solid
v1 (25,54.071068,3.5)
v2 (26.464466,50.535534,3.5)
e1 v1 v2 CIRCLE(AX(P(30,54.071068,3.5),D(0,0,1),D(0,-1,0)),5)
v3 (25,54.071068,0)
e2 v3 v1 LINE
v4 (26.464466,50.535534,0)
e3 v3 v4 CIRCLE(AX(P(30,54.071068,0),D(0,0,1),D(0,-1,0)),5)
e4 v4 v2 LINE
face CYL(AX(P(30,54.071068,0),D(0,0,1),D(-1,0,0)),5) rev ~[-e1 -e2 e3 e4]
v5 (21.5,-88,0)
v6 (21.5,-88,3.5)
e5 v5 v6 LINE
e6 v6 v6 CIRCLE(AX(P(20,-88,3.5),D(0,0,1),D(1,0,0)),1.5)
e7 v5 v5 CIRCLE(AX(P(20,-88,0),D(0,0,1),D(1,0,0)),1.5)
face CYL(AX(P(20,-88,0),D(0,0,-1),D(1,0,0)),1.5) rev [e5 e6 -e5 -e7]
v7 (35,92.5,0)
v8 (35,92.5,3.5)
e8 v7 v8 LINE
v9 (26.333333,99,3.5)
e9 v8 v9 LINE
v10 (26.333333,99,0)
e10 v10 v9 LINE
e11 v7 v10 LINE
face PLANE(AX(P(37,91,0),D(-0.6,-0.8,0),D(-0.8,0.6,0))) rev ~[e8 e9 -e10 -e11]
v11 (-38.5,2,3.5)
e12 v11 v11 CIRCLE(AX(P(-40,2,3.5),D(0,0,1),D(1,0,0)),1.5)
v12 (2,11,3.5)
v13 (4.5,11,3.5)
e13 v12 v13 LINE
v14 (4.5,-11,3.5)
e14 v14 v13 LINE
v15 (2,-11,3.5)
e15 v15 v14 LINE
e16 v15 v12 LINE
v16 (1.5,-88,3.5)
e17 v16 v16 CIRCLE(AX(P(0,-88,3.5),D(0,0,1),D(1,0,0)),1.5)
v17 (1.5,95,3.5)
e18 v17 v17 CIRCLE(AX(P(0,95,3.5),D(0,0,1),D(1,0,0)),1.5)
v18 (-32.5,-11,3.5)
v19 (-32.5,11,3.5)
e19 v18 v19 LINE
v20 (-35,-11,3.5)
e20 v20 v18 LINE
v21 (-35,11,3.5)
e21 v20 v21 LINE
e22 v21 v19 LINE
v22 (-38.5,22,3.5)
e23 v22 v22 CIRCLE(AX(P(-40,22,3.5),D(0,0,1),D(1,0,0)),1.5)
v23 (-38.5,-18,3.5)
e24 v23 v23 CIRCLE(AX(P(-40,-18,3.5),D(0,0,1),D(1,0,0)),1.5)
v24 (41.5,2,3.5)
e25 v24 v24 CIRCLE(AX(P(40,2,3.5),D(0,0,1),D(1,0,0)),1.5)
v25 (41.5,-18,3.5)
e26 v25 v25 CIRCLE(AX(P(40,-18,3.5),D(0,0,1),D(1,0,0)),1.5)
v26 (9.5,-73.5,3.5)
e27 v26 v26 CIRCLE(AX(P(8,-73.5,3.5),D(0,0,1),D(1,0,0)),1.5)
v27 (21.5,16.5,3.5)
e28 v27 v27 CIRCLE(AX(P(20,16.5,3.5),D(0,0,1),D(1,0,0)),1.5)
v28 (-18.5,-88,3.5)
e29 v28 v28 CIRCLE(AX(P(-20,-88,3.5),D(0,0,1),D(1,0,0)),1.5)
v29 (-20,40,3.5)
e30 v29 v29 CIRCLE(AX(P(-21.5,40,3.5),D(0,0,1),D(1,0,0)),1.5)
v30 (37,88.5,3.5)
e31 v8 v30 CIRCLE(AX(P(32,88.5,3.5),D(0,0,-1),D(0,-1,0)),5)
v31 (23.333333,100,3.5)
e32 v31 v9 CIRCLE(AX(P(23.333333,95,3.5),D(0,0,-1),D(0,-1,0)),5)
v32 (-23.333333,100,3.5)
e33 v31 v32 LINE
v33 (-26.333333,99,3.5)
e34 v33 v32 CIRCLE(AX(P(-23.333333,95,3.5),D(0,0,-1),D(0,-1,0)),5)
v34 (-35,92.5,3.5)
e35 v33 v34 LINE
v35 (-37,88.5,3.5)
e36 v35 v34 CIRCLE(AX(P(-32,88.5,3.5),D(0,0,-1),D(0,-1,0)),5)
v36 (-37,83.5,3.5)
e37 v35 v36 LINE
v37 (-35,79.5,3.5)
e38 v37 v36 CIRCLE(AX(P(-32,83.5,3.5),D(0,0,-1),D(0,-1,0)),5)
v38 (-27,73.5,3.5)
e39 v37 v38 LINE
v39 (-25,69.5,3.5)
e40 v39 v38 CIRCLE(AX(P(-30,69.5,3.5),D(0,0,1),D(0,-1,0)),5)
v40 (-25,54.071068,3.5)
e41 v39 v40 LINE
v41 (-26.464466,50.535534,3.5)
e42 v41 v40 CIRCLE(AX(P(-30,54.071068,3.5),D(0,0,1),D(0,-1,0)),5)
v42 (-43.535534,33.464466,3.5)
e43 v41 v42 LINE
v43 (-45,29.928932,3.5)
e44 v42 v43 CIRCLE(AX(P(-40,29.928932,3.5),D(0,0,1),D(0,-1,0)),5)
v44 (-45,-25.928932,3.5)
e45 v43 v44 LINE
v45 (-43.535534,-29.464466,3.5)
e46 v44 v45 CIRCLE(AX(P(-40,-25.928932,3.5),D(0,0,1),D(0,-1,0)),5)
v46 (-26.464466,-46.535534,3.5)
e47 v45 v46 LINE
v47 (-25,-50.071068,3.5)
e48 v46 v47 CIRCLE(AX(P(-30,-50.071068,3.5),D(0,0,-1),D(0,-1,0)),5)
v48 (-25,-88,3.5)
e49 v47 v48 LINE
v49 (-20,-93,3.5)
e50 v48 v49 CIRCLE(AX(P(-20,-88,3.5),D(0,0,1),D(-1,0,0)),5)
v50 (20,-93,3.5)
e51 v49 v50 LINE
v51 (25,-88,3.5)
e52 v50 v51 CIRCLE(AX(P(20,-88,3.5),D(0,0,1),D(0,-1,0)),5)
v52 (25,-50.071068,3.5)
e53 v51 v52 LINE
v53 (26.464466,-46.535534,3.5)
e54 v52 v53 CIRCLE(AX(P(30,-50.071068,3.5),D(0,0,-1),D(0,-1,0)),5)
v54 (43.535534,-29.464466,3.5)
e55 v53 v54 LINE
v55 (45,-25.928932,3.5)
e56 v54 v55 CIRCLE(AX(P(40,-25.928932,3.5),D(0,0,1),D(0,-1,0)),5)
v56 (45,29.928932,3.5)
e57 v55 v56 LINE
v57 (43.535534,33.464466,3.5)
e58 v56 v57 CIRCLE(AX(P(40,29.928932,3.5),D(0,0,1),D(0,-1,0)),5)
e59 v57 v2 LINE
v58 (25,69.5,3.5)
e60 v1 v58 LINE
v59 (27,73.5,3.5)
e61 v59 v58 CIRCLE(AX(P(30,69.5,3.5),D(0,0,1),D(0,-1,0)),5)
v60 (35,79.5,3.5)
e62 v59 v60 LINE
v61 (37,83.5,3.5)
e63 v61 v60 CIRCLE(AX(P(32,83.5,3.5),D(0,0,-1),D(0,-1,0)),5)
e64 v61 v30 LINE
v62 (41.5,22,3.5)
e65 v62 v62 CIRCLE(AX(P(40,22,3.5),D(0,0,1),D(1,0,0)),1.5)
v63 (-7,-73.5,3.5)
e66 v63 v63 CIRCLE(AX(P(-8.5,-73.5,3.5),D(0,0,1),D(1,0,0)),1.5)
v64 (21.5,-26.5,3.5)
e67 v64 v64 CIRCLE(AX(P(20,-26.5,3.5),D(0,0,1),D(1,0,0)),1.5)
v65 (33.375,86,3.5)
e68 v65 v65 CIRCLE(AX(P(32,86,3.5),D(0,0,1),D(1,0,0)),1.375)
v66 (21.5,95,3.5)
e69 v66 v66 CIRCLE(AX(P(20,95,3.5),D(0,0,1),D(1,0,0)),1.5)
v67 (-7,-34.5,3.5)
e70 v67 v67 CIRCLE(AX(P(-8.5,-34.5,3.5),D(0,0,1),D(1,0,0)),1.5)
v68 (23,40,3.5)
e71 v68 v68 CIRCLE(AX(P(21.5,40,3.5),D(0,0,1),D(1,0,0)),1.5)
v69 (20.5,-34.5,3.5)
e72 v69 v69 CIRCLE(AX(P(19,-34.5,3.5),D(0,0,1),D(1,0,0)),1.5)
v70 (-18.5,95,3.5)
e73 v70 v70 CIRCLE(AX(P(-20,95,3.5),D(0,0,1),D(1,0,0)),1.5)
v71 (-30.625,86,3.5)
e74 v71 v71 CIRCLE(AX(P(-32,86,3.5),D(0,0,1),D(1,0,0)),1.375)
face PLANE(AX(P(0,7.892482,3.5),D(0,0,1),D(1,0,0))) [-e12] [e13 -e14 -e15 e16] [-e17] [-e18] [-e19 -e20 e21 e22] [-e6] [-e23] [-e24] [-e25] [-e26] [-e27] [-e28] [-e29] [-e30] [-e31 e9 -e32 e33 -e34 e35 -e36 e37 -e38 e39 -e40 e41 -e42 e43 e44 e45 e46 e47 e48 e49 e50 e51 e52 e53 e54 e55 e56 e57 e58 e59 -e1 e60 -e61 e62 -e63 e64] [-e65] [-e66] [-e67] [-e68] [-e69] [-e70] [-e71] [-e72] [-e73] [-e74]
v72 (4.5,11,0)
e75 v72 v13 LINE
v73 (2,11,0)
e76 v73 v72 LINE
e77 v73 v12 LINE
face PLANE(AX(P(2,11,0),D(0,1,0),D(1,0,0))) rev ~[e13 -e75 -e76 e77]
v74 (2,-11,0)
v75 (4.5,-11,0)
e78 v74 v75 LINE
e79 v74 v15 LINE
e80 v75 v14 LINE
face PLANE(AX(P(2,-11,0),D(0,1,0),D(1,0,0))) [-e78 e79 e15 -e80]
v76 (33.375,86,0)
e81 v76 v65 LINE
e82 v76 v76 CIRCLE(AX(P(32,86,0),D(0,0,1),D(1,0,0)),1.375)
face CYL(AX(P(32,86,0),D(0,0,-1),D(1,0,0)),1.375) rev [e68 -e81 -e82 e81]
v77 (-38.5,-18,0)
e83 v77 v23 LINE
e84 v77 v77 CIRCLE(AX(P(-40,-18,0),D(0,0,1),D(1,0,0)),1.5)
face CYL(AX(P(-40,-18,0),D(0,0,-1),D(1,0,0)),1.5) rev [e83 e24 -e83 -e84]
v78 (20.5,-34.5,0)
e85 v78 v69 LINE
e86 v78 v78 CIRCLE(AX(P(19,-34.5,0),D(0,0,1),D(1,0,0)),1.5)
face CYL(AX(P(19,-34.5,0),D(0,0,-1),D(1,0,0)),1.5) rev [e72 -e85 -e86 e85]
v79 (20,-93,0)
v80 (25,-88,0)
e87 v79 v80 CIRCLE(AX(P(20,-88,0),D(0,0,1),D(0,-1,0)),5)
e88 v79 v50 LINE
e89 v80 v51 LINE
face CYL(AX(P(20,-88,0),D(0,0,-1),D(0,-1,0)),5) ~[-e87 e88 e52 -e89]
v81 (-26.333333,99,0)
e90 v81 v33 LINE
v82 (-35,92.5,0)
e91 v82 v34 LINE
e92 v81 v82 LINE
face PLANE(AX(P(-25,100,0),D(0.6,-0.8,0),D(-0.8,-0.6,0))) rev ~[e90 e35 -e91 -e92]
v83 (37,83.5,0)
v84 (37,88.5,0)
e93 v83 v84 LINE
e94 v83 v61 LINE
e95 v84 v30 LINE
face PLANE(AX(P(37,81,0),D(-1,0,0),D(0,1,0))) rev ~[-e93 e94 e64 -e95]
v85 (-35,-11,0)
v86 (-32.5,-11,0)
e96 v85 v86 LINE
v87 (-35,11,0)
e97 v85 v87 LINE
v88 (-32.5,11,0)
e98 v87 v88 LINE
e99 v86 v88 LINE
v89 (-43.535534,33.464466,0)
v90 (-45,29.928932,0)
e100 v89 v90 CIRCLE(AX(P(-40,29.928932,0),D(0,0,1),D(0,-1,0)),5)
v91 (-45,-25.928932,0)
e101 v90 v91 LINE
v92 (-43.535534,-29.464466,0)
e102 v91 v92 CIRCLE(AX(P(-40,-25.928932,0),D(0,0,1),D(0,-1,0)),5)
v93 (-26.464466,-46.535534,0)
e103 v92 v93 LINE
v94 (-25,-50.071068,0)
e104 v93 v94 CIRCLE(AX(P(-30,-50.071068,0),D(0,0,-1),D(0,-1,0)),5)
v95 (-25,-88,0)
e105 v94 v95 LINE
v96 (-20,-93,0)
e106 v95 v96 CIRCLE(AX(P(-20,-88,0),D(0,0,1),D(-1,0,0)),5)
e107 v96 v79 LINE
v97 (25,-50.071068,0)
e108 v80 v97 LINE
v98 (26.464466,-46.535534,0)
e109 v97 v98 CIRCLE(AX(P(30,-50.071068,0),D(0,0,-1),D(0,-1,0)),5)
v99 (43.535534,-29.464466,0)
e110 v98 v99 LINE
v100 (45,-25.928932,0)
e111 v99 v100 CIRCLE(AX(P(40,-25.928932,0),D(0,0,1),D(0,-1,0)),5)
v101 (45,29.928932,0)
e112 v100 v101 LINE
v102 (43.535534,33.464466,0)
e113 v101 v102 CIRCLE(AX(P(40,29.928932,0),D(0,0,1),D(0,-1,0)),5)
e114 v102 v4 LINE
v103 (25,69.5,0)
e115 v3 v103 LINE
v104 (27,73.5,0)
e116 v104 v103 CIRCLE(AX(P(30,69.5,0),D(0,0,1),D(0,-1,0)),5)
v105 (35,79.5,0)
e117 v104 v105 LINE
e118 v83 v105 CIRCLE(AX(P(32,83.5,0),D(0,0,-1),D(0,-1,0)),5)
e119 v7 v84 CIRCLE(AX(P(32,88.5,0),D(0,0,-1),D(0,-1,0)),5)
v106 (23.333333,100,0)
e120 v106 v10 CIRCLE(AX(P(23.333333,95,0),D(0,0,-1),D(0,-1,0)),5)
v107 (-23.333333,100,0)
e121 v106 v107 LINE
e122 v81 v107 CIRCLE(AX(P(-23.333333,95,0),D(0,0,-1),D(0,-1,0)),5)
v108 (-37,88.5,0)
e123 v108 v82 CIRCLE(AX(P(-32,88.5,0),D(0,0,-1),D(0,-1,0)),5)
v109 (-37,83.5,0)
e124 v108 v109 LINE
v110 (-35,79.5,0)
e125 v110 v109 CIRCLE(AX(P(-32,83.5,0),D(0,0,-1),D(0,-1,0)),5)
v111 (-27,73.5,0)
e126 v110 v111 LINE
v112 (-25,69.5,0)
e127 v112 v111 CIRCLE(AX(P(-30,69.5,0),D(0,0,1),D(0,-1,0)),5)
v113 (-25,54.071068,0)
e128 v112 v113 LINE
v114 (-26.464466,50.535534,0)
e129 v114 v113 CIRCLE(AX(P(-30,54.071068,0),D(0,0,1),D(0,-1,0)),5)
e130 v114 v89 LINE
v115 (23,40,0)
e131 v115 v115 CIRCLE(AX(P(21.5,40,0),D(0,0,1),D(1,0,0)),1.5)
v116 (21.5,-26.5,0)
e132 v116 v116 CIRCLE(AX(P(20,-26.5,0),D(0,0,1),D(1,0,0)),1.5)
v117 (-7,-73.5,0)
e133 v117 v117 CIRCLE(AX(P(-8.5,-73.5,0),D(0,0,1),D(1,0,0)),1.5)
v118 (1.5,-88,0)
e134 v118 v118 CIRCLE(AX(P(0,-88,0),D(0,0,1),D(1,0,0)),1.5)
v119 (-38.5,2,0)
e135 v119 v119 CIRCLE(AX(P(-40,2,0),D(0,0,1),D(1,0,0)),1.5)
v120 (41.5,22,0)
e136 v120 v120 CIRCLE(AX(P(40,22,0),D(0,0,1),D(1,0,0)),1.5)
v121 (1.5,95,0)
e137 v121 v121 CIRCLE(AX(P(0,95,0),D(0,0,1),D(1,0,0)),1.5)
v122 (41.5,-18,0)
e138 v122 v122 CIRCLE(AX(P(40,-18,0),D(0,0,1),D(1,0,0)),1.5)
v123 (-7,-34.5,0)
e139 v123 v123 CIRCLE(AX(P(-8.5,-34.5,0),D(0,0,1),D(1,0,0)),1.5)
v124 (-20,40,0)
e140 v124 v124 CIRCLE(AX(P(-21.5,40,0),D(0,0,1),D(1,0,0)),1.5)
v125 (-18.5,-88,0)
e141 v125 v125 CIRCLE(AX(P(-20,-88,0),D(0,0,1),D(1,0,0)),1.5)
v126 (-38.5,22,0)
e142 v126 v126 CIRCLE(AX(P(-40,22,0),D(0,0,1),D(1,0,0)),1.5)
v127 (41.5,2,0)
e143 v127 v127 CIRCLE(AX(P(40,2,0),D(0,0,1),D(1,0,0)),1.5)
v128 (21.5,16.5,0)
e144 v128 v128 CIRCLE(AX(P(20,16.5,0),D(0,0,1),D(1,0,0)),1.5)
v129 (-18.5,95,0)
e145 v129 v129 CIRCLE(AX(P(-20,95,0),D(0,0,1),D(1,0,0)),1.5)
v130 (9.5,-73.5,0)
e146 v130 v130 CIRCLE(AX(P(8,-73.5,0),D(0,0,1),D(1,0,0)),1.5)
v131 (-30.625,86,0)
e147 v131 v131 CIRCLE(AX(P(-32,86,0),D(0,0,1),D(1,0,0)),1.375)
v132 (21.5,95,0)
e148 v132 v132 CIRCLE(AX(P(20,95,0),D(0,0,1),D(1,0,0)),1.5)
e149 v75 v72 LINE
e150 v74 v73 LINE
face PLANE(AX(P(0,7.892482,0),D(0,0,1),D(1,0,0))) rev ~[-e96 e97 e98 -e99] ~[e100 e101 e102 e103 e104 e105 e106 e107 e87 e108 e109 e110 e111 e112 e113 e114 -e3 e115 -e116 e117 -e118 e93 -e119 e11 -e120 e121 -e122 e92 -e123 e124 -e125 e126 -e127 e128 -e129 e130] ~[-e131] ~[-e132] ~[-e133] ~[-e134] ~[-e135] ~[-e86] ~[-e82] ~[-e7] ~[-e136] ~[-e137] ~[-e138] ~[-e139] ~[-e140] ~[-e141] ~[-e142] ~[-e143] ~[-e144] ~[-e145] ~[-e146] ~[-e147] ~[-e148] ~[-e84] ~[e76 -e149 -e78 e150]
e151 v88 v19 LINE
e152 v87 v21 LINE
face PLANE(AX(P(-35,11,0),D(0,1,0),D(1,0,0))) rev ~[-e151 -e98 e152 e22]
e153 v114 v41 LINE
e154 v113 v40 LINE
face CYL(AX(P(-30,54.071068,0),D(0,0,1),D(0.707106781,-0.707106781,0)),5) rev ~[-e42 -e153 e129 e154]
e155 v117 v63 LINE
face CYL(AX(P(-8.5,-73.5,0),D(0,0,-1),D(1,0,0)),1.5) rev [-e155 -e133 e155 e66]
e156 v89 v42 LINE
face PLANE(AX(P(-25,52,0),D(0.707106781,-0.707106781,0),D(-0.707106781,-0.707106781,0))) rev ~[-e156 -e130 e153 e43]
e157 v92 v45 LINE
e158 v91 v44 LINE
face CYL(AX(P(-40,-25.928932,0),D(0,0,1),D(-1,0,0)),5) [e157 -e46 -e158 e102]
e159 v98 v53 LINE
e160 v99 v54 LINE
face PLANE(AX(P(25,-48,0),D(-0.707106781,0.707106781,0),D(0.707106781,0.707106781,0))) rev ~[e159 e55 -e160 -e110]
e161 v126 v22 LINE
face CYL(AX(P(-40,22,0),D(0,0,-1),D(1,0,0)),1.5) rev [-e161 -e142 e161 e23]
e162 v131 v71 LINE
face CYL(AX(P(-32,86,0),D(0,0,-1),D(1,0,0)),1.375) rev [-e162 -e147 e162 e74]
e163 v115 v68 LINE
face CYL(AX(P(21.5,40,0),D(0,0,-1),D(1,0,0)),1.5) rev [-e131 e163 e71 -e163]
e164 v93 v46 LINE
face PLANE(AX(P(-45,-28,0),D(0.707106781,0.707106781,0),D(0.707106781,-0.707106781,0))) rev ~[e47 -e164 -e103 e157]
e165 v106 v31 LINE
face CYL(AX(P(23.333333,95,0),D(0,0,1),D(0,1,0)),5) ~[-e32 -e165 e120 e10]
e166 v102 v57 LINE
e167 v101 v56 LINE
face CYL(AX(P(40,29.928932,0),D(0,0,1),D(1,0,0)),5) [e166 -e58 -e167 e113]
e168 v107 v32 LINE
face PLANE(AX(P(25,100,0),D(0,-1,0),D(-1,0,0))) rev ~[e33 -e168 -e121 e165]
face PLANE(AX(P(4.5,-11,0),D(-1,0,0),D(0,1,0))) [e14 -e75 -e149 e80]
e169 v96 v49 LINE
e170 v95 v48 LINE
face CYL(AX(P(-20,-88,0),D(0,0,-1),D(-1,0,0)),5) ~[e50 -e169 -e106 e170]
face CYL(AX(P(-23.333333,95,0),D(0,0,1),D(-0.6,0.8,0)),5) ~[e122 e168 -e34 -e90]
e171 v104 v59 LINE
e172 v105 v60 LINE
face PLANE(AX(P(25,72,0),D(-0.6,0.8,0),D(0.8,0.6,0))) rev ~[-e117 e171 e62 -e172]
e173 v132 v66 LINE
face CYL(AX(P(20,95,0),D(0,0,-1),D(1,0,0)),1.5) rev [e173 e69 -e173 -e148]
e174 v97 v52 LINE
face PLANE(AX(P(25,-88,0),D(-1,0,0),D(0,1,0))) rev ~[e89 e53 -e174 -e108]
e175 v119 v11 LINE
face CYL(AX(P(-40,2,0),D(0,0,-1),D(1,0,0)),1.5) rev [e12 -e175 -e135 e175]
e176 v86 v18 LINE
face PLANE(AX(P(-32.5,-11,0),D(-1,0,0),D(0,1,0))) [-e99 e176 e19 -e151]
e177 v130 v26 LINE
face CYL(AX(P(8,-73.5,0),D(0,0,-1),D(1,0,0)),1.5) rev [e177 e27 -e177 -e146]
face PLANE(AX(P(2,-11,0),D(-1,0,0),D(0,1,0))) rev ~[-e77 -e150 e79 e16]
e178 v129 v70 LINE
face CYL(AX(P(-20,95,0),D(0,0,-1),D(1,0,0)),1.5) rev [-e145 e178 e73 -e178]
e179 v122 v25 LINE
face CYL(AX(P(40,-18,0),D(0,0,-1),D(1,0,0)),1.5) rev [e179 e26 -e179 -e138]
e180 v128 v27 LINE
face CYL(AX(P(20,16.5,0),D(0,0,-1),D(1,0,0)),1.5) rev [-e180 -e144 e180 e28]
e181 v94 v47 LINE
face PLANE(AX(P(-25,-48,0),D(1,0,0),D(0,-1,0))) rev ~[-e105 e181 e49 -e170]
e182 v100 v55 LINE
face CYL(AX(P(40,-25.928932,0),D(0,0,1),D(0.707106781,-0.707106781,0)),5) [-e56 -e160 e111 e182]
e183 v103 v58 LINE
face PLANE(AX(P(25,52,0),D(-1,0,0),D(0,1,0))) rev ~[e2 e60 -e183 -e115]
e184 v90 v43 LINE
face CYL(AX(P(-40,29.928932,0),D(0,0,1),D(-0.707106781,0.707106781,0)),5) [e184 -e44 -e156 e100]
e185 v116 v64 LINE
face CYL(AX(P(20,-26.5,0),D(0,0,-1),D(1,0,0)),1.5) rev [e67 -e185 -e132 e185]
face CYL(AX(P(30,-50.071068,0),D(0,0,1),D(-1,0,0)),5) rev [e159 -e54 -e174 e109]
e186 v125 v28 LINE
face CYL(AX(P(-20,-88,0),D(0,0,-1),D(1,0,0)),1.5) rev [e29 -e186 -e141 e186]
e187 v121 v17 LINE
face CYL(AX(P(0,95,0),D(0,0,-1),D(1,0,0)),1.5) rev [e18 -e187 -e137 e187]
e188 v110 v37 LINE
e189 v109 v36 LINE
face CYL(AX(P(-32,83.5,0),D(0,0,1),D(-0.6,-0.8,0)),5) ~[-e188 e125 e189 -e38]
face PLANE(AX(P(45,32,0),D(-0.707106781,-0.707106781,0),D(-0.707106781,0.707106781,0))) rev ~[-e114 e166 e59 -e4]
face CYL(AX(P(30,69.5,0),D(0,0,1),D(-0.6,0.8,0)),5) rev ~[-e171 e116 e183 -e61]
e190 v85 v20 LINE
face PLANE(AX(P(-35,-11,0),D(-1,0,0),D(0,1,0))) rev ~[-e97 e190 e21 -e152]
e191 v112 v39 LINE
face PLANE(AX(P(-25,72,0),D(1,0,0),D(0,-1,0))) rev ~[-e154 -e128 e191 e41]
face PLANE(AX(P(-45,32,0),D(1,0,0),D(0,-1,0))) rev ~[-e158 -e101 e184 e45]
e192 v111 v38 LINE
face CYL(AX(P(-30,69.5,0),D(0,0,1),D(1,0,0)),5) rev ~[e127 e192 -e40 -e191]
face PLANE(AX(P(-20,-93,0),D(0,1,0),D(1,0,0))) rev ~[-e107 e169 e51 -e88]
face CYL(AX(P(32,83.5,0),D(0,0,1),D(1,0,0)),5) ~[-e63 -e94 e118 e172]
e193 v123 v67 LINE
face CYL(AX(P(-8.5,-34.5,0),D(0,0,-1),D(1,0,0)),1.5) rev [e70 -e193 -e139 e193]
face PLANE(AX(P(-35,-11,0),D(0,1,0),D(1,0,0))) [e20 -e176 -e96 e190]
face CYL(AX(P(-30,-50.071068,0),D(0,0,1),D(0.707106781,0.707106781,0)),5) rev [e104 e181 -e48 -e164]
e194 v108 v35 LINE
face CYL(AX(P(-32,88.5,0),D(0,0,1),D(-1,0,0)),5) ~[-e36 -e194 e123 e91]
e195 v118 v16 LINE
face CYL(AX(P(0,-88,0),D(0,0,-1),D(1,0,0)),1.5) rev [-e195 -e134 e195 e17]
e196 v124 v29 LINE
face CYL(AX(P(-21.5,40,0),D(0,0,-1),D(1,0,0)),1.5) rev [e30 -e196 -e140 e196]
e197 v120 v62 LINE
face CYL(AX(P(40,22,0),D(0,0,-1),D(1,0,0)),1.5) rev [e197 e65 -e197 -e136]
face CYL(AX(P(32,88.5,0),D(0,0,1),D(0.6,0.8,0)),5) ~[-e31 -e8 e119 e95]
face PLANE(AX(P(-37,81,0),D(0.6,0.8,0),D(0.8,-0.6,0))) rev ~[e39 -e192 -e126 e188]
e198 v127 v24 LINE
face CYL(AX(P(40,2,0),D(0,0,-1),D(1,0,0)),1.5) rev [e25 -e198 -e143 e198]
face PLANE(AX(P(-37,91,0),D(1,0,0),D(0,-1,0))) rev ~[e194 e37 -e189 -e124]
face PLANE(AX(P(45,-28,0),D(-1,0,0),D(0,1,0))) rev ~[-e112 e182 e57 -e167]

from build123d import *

# Parameters (mm, degrees)
F0_R     = 1.5
F0_W     = 2.5
F0_H     = 22
F0_R_2   = 1.375
F1_DEPTH = 3.5
F2_R     = 5


# Not quite as in the source:
# - a feature names something its author has since deleted; it is built from what else it names


with BuildPart() as f1:
    # F0 (on Top) → F1 (new body)
    with BuildSketch(Plane.XY):
        with BuildLine():
            Line((-25, 52), (-45, 32))
            Line((-45, 32), (-45, -28))
            Line((-45, -28), (-25, -48))
            Line((-25, -48), (-25, -88))
            ThreePointArc((-25, -88), (-23.5355339059, -91.5355339059), (-20, -93))
            Line((-20, -93), (20, -93))
            ThreePointArc((20, -93), (23.5355339059, -91.5355339059), (25, -88))
            Line((25, -88), (25, -48))
            Line((25, -48), (45, -28))
            Line((45, -28), (45, 32))
            Line((45, 32), (25, 52))
            Line((25, 52), (25, 72))
            Line((25, 72), (37, 81))
            Line((37, 81), (37, 91))
            Line((37, 91), (25, 100))
            Line((25, 100), (-25, 100))
            Line((-25, 100), (-37, 91))
            Line((-37, 91), (-37, 81))
            Line((-37, 81), (-25, 72))
            Line((-25, 72), (-25, 52))
        make_face()
        with Locations((-20, -88)):
            Circle(F0_R, mode=Mode.SUBTRACT)
        with Locations((-8.5, -73.5)):
            Circle(F0_R, mode=Mode.SUBTRACT)
        with Locations((-40, -18)):
            Circle(F0_R, mode=Mode.SUBTRACT)
        with Locations((-40, 2)):
            Circle(F0_R, mode=Mode.SUBTRACT)
        with Locations((-33.75, 0)):
            Rectangle(F0_W, F0_H, mode=Mode.SUBTRACT)
        with Locations((-8.5, -34.5)):
            Circle(F0_R, mode=Mode.SUBTRACT)
        with Locations((0, -88)):
            Circle(F0_R, mode=Mode.SUBTRACT)
        with Locations((8, -73.5)):
            Circle(F0_R, mode=Mode.SUBTRACT)
        with Locations((20, -88)):
            Circle(F0_R, mode=Mode.SUBTRACT)
        with Locations((19, -34.5)):
            Circle(F0_R, mode=Mode.SUBTRACT)
        with Locations((20, -26.5)):
            Circle(F0_R, mode=Mode.SUBTRACT)
        with Locations((3.25, 0)):
            Rectangle(F0_W, F0_H, mode=Mode.SUBTRACT)
        with Locations((40, -18)):
            Circle(F0_R, mode=Mode.SUBTRACT)
        with Locations((40, 2)):
            Circle(F0_R, mode=Mode.SUBTRACT)
        with Locations((-40, 22)):
            Circle(F0_R, mode=Mode.SUBTRACT)
        with Locations((-21.5, 40)):
            Circle(F0_R, mode=Mode.SUBTRACT)
        with Locations((-32, 86)):
            Circle(F0_R_2, mode=Mode.SUBTRACT)
        with Locations((-20, 95)):
            Circle(F0_R, mode=Mode.SUBTRACT)
        with Locations((20, 16.5)):
            Circle(F0_R, mode=Mode.SUBTRACT)
        with Locations((21.5, 40)):
            Circle(F0_R, mode=Mode.SUBTRACT)
        with Locations((40, 22)):
            Circle(F0_R, mode=Mode.SUBTRACT)
        with Locations((0, 95)):
            Circle(F0_R, mode=Mode.SUBTRACT)
        with Locations((20, 95)):
            Circle(F0_R, mode=Mode.SUBTRACT)
        with Locations((32, 86)):
            Circle(F0_R_2, mode=Mode.SUBTRACT)
    extrude(amount=F1_DEPTH)

    # F2
    f2_edges = [f1.edges().sort_by_distance(p)[0] for p in [
        (-45, -28, 1.75),
        (-25, -48, 1.75),
        (25, -48, 1.75),
        (45, -28, 1.75),
        (45, 32, 1.75),
        (25, 52, 1.75),
        (25, 72, 1.75),
        (-25, 52, 1.75),
        (-45, 32, 1.75),
        (-25, 72, 1.75),
        (-37, 81, 1.75),
        (-37, 91, 1.75),
        (-25, 100, 1.75),
        (25, 100, 1.75),
        (37, 91, 1.75),
        (37, 81, 1.75),
    ]]
    fillet(f2_edges, radius=F2_R)


solid = f1.part
